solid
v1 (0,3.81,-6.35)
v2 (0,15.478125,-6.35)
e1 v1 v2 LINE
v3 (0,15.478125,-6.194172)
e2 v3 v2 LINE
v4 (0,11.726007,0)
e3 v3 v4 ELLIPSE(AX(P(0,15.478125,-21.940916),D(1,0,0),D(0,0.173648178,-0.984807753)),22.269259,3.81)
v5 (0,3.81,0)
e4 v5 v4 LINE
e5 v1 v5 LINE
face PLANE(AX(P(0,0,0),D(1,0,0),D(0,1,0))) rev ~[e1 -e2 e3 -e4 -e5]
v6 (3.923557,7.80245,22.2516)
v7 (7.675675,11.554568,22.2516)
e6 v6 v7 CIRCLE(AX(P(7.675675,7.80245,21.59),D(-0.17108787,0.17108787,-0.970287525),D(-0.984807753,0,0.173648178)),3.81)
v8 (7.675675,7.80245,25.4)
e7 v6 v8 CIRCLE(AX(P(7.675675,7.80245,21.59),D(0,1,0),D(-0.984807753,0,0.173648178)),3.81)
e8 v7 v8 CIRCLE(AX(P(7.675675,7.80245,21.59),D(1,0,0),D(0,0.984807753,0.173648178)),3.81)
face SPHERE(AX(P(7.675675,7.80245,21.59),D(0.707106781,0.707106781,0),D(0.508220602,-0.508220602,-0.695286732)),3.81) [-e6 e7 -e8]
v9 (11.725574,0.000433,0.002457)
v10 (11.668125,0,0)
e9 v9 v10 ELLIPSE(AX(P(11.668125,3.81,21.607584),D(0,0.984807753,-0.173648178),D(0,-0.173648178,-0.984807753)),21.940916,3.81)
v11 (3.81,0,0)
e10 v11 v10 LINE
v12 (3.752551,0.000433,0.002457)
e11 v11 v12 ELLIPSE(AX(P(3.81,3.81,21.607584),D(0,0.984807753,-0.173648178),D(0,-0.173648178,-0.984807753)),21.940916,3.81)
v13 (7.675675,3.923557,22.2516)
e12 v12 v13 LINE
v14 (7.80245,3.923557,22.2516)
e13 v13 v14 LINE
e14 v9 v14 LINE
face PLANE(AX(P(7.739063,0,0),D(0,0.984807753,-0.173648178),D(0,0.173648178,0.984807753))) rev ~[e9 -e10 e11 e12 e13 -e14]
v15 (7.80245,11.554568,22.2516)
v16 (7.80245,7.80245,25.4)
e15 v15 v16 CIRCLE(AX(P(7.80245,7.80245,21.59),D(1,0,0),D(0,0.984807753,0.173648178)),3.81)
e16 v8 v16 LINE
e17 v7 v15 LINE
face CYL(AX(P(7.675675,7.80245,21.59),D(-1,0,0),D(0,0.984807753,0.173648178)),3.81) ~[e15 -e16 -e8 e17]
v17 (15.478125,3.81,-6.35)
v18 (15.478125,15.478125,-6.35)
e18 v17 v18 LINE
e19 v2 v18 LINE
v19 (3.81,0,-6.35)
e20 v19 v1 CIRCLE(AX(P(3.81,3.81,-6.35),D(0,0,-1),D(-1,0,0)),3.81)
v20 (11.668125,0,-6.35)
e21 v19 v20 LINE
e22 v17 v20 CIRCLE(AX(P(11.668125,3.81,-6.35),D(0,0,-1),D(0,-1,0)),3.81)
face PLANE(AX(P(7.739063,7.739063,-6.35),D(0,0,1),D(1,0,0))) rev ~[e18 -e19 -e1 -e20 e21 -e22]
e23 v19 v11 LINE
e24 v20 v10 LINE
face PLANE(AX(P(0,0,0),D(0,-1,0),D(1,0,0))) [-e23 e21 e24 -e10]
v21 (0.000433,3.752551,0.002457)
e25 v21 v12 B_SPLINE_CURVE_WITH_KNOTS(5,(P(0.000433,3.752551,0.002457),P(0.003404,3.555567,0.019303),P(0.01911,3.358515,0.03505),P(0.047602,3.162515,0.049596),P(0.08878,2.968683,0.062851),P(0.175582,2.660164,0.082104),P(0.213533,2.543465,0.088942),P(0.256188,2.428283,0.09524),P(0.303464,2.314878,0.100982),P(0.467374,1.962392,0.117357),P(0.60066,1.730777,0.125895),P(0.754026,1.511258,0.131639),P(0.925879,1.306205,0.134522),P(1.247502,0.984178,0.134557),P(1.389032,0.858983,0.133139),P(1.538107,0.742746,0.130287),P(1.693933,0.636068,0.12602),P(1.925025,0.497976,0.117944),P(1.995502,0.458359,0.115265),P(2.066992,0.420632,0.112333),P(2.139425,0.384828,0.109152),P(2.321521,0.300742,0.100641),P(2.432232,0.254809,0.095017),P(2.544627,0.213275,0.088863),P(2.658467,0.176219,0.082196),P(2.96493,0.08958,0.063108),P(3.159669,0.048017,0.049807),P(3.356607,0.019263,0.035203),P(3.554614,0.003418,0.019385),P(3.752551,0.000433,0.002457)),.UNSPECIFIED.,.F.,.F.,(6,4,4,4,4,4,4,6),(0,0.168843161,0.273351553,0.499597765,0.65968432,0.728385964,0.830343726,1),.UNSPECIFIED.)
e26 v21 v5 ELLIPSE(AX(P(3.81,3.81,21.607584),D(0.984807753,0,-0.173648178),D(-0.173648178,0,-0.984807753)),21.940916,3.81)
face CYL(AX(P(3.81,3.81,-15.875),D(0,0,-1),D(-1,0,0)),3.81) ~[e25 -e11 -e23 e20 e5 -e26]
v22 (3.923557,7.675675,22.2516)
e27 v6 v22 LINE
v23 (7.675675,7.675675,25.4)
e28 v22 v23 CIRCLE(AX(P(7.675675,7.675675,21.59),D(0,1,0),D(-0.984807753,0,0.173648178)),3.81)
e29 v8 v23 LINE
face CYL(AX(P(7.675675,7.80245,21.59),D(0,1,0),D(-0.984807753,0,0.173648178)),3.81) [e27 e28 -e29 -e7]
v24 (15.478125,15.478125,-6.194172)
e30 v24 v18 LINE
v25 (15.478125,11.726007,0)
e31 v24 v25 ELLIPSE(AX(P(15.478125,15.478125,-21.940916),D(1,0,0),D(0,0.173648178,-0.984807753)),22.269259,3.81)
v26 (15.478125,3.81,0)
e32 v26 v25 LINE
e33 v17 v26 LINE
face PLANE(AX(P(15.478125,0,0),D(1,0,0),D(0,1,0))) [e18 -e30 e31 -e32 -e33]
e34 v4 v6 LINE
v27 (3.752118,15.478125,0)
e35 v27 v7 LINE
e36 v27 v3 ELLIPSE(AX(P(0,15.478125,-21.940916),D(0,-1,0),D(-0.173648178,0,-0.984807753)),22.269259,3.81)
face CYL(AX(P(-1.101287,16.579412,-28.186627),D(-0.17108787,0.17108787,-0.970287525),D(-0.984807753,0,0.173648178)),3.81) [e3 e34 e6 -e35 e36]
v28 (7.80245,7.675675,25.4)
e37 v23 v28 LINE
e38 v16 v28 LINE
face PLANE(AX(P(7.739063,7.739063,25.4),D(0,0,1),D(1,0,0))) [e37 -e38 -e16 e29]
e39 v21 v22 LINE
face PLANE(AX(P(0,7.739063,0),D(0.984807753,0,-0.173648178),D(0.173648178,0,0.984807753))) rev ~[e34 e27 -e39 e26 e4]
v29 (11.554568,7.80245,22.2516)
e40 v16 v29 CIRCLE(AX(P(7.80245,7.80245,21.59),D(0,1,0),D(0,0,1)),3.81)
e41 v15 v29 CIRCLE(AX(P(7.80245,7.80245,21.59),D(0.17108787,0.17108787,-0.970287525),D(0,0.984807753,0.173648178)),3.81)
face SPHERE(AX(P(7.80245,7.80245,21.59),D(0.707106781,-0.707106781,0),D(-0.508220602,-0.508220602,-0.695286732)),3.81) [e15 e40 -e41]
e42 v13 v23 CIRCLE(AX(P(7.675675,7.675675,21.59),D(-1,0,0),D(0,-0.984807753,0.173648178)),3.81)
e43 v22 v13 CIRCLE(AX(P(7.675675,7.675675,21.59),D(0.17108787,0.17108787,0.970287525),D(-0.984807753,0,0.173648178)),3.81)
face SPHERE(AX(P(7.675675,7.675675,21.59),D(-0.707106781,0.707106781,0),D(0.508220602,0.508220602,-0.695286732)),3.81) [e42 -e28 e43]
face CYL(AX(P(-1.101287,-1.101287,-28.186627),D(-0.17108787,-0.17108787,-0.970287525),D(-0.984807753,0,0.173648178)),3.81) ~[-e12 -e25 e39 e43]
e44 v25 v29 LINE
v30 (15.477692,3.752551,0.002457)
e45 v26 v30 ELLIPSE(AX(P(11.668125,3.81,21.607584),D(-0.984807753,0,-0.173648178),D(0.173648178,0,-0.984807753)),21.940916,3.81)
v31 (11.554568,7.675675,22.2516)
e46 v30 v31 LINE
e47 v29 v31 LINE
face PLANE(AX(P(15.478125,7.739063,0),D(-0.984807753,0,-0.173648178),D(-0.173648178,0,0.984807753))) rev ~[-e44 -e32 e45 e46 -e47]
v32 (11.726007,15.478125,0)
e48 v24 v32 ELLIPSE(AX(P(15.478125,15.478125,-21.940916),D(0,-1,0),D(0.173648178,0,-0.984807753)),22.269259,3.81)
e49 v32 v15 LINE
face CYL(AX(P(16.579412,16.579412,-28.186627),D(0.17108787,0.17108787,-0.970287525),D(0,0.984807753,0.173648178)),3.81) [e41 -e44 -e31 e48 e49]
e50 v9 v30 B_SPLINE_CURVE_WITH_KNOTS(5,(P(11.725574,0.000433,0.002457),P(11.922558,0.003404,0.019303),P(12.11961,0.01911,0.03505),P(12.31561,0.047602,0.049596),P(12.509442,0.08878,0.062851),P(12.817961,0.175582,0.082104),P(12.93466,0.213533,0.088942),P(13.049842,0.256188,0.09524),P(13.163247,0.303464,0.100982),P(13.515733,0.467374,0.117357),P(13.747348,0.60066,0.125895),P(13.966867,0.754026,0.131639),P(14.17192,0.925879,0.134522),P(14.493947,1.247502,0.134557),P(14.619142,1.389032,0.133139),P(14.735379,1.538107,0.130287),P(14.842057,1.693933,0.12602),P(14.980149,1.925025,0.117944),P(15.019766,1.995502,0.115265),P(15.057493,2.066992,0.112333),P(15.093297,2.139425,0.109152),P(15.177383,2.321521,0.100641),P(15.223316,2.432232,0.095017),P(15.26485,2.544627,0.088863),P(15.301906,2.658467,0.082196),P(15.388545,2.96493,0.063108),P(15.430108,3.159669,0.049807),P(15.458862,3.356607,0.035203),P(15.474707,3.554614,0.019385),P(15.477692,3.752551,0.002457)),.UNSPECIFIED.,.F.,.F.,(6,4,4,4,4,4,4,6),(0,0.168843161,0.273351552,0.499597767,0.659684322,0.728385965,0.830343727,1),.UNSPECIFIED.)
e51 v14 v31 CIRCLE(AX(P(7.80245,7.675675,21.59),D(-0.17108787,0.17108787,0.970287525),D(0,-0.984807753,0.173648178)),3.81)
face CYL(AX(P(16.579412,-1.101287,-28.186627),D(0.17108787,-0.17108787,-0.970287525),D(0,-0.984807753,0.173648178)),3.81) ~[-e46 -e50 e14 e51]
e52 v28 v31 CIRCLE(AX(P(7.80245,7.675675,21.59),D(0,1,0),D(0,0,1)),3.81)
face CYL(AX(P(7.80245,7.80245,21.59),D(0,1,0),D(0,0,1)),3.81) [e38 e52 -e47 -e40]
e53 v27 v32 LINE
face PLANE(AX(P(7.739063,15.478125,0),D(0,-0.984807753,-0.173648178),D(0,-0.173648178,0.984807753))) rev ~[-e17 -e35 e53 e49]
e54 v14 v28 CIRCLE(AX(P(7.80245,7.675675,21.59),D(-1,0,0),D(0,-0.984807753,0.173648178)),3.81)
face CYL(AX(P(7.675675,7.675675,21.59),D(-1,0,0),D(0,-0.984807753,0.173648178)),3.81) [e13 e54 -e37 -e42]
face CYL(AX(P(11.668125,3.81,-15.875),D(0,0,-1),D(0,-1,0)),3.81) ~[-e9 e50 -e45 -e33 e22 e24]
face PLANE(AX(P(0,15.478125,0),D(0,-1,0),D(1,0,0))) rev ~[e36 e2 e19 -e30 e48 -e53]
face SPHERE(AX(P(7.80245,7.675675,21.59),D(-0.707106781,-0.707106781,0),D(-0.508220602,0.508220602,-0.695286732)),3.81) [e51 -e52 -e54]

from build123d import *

# Parameters (mm, degrees)
F0_W         = 15.478125
F0_H         = 15.478125
F1_DEPTH     = 6.35
F2_DEPTH     = 25.4
F2_TAPER     = 10
F3_T1_DEPTH  = 51.3009034407
F3_T3_DEPTH  = 51.3009034407
F3_T5_DEPTH  = 51.3009034407
F3_T7_DEPTH  = 51.3009034407
F3_T9_DEPTH  = 44.45
F3_T11_DEPTH = 0.1267751904
F3_T13_DEPTH = 0.1267751904
F3_S17_W     = 14.1899336178
F3_S17_H     = 14.1899336178
F3_T18_DEPTH = 7.0949668089
F3_S29_W     = 14.1899336177
F3_S29_H     = 14.1899336178
F3_T30_DEPTH = 7.0949668089
F3_S41_W     = 14.1899336177
F3_S41_H     = 14.1899336178
F3_T42_DEPTH = 7.0949668089
F3_S53_W     = 14.1899336178
F3_S53_H     = 14.1899336178
F3_T54_DEPTH = 7.0949668089


# Not quite as in the source:
# - a fillet or chamfer that OpenCascade refuses, or shapes differently, is made with other operations: its cross-section is extruded or revolved along the edge and cut away or added


with BuildPart() as f1:
    # F0 (on Top) → F1 (new body)
    with BuildSketch(Plane.XY):
        with Locations((7.7390625, 7.7390625)):
            Rectangle(F0_W, F0_H)
    extrude(amount=-F1_DEPTH)

    # F0 (on Top) → F2 (join)
    with BuildSketch(Plane.XY):
        with Locations((7.7390625, 7.7390625)):
            Rectangle(F0_W, F0_H)
    extrude(amount=F2_DEPTH, taper=F2_TAPER)

    # F3: fillet of radius 3.81 on 10 edges, made by hand

    # F3_s2 → F3_t1 (cut)
    with BuildSketch(Plane(origin=(5.649698691, 5.649698691, -32.0410334724), x_dir=(0.7071067812, -0.7071067812, 0), z_dir=(-0.1710878697, -0.1710878697, 0.9702875252))):
        with BuildLine():
            ThreePointArc((-2.6531477556, 18.6646706441), (0, 19.7402772951), (2.6531477556, 18.6646706441))
            Line((2.6531477556, 18.6646706441), (0, 21.238986814))
            Line((0, 21.238986814), (-2.6531477556, 18.6646706441))
        make_face()
    extrude(amount=F3_T1_DEPTH, mode=Mode.SUBTRACT)

    # F3_s4 → F3_t3 (cut)
    with BuildSketch(Plane(origin=(-5.1966375782, 5.1966375782, -29.4715962203), x_dir=(0.7071067812, 0.7071067812, 0), z_dir=(0.1710878697, -0.1710878697, 0.9702875252))):
        with BuildLine():
            ThreePointArc((8.2915393919, 8.0451772371), (10.9446871476, 9.1207838881), (13.5978349032, 8.0451772371))
            Line((13.5978349032, 8.0451772371), (10.9446871476, 10.619493407))
            Line((10.9446871476, 10.619493407), (8.2915393919, 8.0451772371))
        make_face()
    extrude(amount=F3_T3_DEPTH, mode=Mode.SUBTRACT)

    # F3_s6 → F3_t5 (cut)
    with BuildSketch(Plane(origin=(5.1966375782, -5.1966375782, -29.4715962203), x_dir=(-0.7071067812, -0.7071067812, 0), z_dir=(-0.1710878697, 0.1710878697, 0.9702875252))):
        with BuildLine():
            ThreePointArc((-8.2915393919, 8.0451772371), (-10.9446871476, 9.1207838881), (-13.5978349032, 8.0451772371))
            Line((-13.5978349032, 8.0451772371), (-10.9446871476, 10.619493407))
            Line((-10.9446871476, 10.619493407), (-8.2915393919, 8.0451772371))
        make_face()
    extrude(amount=F3_T5_DEPTH, mode=Mode.SUBTRACT)

    # F3_s8 → F3_t7 (cut)
    with BuildSketch(Plane(origin=(-4.7435764654, -4.7435764654, -26.9021589682), x_dir=(-0.7071067812, 0.7071067812, 0), z_dir=(0.1710878697, 0.1710878697, 0.9702875252))):
        with BuildLine():
            ThreePointArc((2.6531477556, -2.5743161699), (0, -1.4987095189), (-2.6531477556, -2.5743161699))
            Line((-2.6531477556, -2.5743161699), (0, 0))
            Line((0, 0), (2.6531477556, -2.5743161699))
        make_face()
    extrude(amount=F3_T7_DEPTH, mode=Mode.SUBTRACT)

    # F3_s10 → F3_t9 (cut)
    with BuildSketch(Plane.XY.offset(-15.875)):
        with BuildLine():
            ThreePointArc((0, 3.81), (1.1159231637, 1.1159231637), (3.81, 0))
            Line((3.81, 0), (0, 0))
            Line((0, 0), (0, 3.81))
        make_face()
        with BuildLine():
            ThreePointArc((11.668125, 0), (14.3622018363, 1.1159231637), (15.478125, 3.81))
            Line((15.478125, 3.81), (15.478125, 0))
            Line((15.478125, 0), (11.668125, 0))
        make_face()
    extrude(amount=F3_T9_DEPTH, mode=Mode.SUBTRACT)

    # F3_s12 → F3_t11 (cut)
    with BuildSketch(Plane.XZ.offset(-7.8024500952)):
        with BuildLine():
            ThreePointArc((7.8024500952, 25.4), (10.2514708881, 24.5086293283), (11.5545676342, 22.2515995569))
            Line((11.5545676342, 22.2515995569), (10.99941969, 25.4))
            Line((10.99941969, 25.4), (7.8024500952, 25.4))
        make_face()
        with BuildLine():
            ThreePointArc((3.9235573658, 22.2515995569), (5.2266541119, 24.5086293283), (7.6756749048, 25.4))
            Line((7.6756749048, 25.4), (4.47870531, 25.4))
            Line((4.47870531, 25.4), (3.9235573658, 22.2515995569))
        make_face()
    extrude(amount=F3_T11_DEPTH, mode=Mode.SUBTRACT)

    # F3_s14 → F3_t13 (cut)
    with BuildSketch(Plane.YZ.offset(7.6756749048)):
        with BuildLine():
            ThreePointArc((3.9235573658, 22.2515995569), (5.2266541119, 24.5086293283), (7.6756749048, 25.4))
            Line((7.6756749048, 25.4), (4.47870531, 25.4))
            Line((4.47870531, 25.4), (3.9235573658, 22.2515995569))
        make_face()
        with BuildLine():
            ThreePointArc((11.5545676342, 22.2515995569), (10.2514708881, 24.5086293283), (7.8024500952, 25.4))
            Line((7.8024500952, 25.4), (10.99941969, 25.4))
            Line((10.99941969, 25.4), (11.5545676342, 22.2515995569))
        make_face()
    extrude(amount=F3_T13_DEPTH, mode=Mode.SUBTRACT)


with BuildPart() as f3_tool16:
    # F3_s17 → F3_t18 (new body)
    with BuildSketch(Plane(origin=(11.6595829736, 11.6595829736, 15.951248959), x_dir=(-0.7071067812, 0.7071067812, 0), z_dir=(0.5082206017, 0.5082206017, 0.6952867322))):
        with Locations((0, 7.8454102114)):
            Rectangle(F3_S17_W, F3_S17_H)
    extrude(amount=F3_T18_DEPTH)

    split(bisect_by=Plane.XZ.offset(-7.8024500952), keep=Keep.BOTTOM)

    split(bisect_by=Plane(origin=(-3.1272635948, -3.1272635948, 17.7355931701), x_dir=(0.7071067812, -0.7071067812, 0), z_dir=(-0.1710878697, -0.1710878697, 0.9702875252)), keep=Keep.TOP)

    split(bisect_by=Plane.YZ.offset(7.8024500952), keep=Keep.TOP)

    split(bisect_by=Plane.XY.offset(25.4), keep=Keep.BOTTOM)

    split(bisect_by=Plane(origin=(15.0114024231, 0, 2.6469152655), x_dir=(0, 1, 0), z_dir=(-0.984807753, 0, -0.1736481777)), keep=Keep.TOP)

    split(bisect_by=Plane(origin=(0, 15.0114024231, 2.6469152655), x_dir=(1, 0, 0), z_dir=(0, -0.984807753, -0.1736481777)), keep=Keep.TOP)

    # F3_s25 → F3_t26 (revolve, cut)
    with BuildSketch(Plane(origin=(7.8024500952, 7.8024500952, 21.59), x_dir=(-0.5082206017, -0.5082206017, -0.6952867322), z_dir=(-0.4916419632, -0.4916419632, 0.7187324676))):
        with BuildLine():
            ThreePointArc((0, -3.81), (3.81, 0), (0, 3.81))
            Line((0, 3.81), (0, -3.81))
        make_face()
    revolve(axis=Axis((7.8024500952, 7.8024500952, 21.59), (0.7071067812, -0.7071067812, 0)), mode=Mode.SUBTRACT)


with BuildPart() as f1_1:
    add(f1.part)

    # F3_t15: cut F3_tool16
    add(f3_tool16.part, mode=Mode.SUBTRACT)


with BuildPart() as f3_tool28:
    # F3_s29 → F3_t30 (new body)
    with BuildSketch(Plane(origin=(-7.6617662372, 7.6617662372, 10.4819135463), x_dir=(-0.7071067812, -0.7071067812, 0), z_dir=(-0.5082206017, 0.5082206017, 0.6952867322))):
        with Locations((-10.9446871475, 15.455105973)):
            Rectangle(F3_S29_W, F3_S29_H)
    extrude(amount=F3_T30_DEPTH)

    split(bisect_by=Plane.XZ.offset(-7.8024500952), keep=Keep.BOTTOM)

    split(bisect_by=Plane(origin=(3.5803247075, -3.5803247075, 20.3050304222), x_dir=(0.7071067812, 0.7071067812, 0), z_dir=(0.1710878697, -0.1710878697, 0.9702875252)), keep=Keep.TOP)

    split(bisect_by=Plane.YZ.offset(7.6756749048), keep=Keep.BOTTOM)

    split(bisect_by=Plane.XY.offset(25.4), keep=Keep.BOTTOM)

    split(bisect_by=Plane(origin=(0, 0, 0), x_dir=(0, 1, 0), z_dir=(0.984807753, 0, -0.1736481777)), keep=Keep.TOP)

    split(bisect_by=Plane(origin=(0, 15.0114024231, 2.6469152655), x_dir=(1, 0, 0), z_dir=(0, -0.984807753, -0.1736481777)), keep=Keep.TOP)

    # F3_s37 → F3_t38 (revolve, cut)
    with BuildSketch(Plane(origin=(7.6756749048, 7.8024500952, 21.59), x_dir=(0.5082206017, -0.5082206017, -0.6952867322), z_dir=(0.4916419632, -0.4916419632, 0.7187324676))):
        with BuildLine():
            ThreePointArc((0, -3.81), (3.81, 0), (0, 3.81))
            Line((0, 3.81), (0, -3.81))
        make_face()
    revolve(axis=Axis((7.6756749048, 7.8024500952, 21.59), (0.7071067812, 0.7071067812, 0)), mode=Mode.SUBTRACT)


with BuildPart() as f1_2:
    add(f1_1.part)

    # F3_t27: cut F3_tool28
    add(f3_tool28.part, mode=Mode.SUBTRACT)


with BuildPart() as f3_tool40:
    # F3_s41 → F3_t42 (new body)
    with BuildSketch(Plane(origin=(7.6617662372, -7.6617662372, 10.4819135463), x_dir=(0.7071067812, 0.7071067812, 0), z_dir=(0.5082206017, -0.5082206017, 0.6952867322))):
        with Locations((10.9446871475, 15.455105973)):
            Rectangle(F3_S41_W, F3_S41_H)
    extrude(amount=F3_T42_DEPTH)

    split(bisect_by=Plane.XZ.offset(-7.6756749048), keep=Keep.TOP)

    split(bisect_by=Plane(origin=(-3.5803247075, 3.5803247075, 20.3050304222), x_dir=(-0.7071067812, -0.7071067812, 0), z_dir=(-0.1710878697, 0.1710878697, 0.9702875252)), keep=Keep.TOP)

    split(bisect_by=Plane.YZ.offset(7.8024500952), keep=Keep.TOP)

    split(bisect_by=Plane.XY.offset(25.4), keep=Keep.BOTTOM)

    split(bisect_by=Plane(origin=(15.0114024231, 0, 2.6469152655), x_dir=(0, 1, 0), z_dir=(-0.984807753, 0, -0.1736481777)), keep=Keep.TOP)

    split(bisect_by=Plane(origin=(0, 0, 0), x_dir=(1, 0, 0), z_dir=(0, 0.984807753, -0.1736481777)), keep=Keep.TOP)

    # F3_s49 → F3_t50 (revolve, cut)
    with BuildSketch(Plane(origin=(7.8024500952, 7.6756749048, 21.59), x_dir=(-0.5082206017, 0.5082206017, -0.6952867322), z_dir=(-0.4916419632, 0.4916419632, 0.7187324676))):
        with BuildLine():
            ThreePointArc((0, -3.81), (3.81, 0), (0, 3.81))
            Line((0, 3.81), (0, -3.81))
        make_face()
    revolve(axis=Axis((7.8024500952, 7.6756749048, 21.59), (-0.7071067812, -0.7071067812, 0)), mode=Mode.SUBTRACT)


with BuildPart() as f1_3:
    add(f1_2.part)

    # F3_t39: cut F3_tool40
    add(f3_tool40.part, mode=Mode.SUBTRACT)


with BuildPart() as f3_tool52:
    # F3_s53 → F3_t54 (new body)
    with BuildSketch(Plane(origin=(-3.6639495007, -3.6639495007, 5.0125781335), x_dir=(0.7071067812, -0.7071067812, 0), z_dir=(-0.5082206017, -0.5082206017, 0.6952867322))):
        with Locations((0, 23.0648017346)):
            Rectangle(F3_S53_W, F3_S53_H)
    extrude(amount=F3_T54_DEPTH)

    split(bisect_by=Plane.XZ.offset(-7.6756749048), keep=Keep.TOP)

    split(bisect_by=Plane(origin=(4.0333858203, 4.0333858203, 22.8744676743), x_dir=(-0.7071067812, 0.7071067812, 0), z_dir=(0.1710878697, 0.1710878697, 0.9702875252)), keep=Keep.TOP)

    split(bisect_by=Plane.YZ.offset(7.6756749048), keep=Keep.BOTTOM)

    split(bisect_by=Plane.XY.offset(25.4), keep=Keep.BOTTOM)

    split(bisect_by=Plane(origin=(0, 0, 0), x_dir=(0, 1, 0), z_dir=(0.984807753, 0, -0.1736481777)), keep=Keep.TOP)

    split(bisect_by=Plane(origin=(0, 0, 0), x_dir=(1, 0, 0), z_dir=(0, 0.984807753, -0.1736481777)), keep=Keep.TOP)

    # F3_s61 → F3_t62 (revolve, cut)
    with BuildSketch(Plane(origin=(7.6756749048, 7.6756749048, 21.59), x_dir=(0.5082206017, 0.5082206017, -0.6952867322), z_dir=(0.4916419632, 0.4916419632, 0.7187324676))):
        with BuildLine():
            ThreePointArc((0, -3.81), (3.81, 0), (0, 3.81))
            Line((0, 3.81), (0, -3.81))
        make_face()
    revolve(axis=Axis((7.6756749048, 7.6756749048, 21.59), (-0.7071067812, 0.7071067812, 0)), mode=Mode.SUBTRACT)


with BuildPart() as f1_4:
    add(f1_3.part)

    # F3_t51: cut F3_tool52
    add(f3_tool52.part, mode=Mode.SUBTRACT)


solid = f1_4.part
